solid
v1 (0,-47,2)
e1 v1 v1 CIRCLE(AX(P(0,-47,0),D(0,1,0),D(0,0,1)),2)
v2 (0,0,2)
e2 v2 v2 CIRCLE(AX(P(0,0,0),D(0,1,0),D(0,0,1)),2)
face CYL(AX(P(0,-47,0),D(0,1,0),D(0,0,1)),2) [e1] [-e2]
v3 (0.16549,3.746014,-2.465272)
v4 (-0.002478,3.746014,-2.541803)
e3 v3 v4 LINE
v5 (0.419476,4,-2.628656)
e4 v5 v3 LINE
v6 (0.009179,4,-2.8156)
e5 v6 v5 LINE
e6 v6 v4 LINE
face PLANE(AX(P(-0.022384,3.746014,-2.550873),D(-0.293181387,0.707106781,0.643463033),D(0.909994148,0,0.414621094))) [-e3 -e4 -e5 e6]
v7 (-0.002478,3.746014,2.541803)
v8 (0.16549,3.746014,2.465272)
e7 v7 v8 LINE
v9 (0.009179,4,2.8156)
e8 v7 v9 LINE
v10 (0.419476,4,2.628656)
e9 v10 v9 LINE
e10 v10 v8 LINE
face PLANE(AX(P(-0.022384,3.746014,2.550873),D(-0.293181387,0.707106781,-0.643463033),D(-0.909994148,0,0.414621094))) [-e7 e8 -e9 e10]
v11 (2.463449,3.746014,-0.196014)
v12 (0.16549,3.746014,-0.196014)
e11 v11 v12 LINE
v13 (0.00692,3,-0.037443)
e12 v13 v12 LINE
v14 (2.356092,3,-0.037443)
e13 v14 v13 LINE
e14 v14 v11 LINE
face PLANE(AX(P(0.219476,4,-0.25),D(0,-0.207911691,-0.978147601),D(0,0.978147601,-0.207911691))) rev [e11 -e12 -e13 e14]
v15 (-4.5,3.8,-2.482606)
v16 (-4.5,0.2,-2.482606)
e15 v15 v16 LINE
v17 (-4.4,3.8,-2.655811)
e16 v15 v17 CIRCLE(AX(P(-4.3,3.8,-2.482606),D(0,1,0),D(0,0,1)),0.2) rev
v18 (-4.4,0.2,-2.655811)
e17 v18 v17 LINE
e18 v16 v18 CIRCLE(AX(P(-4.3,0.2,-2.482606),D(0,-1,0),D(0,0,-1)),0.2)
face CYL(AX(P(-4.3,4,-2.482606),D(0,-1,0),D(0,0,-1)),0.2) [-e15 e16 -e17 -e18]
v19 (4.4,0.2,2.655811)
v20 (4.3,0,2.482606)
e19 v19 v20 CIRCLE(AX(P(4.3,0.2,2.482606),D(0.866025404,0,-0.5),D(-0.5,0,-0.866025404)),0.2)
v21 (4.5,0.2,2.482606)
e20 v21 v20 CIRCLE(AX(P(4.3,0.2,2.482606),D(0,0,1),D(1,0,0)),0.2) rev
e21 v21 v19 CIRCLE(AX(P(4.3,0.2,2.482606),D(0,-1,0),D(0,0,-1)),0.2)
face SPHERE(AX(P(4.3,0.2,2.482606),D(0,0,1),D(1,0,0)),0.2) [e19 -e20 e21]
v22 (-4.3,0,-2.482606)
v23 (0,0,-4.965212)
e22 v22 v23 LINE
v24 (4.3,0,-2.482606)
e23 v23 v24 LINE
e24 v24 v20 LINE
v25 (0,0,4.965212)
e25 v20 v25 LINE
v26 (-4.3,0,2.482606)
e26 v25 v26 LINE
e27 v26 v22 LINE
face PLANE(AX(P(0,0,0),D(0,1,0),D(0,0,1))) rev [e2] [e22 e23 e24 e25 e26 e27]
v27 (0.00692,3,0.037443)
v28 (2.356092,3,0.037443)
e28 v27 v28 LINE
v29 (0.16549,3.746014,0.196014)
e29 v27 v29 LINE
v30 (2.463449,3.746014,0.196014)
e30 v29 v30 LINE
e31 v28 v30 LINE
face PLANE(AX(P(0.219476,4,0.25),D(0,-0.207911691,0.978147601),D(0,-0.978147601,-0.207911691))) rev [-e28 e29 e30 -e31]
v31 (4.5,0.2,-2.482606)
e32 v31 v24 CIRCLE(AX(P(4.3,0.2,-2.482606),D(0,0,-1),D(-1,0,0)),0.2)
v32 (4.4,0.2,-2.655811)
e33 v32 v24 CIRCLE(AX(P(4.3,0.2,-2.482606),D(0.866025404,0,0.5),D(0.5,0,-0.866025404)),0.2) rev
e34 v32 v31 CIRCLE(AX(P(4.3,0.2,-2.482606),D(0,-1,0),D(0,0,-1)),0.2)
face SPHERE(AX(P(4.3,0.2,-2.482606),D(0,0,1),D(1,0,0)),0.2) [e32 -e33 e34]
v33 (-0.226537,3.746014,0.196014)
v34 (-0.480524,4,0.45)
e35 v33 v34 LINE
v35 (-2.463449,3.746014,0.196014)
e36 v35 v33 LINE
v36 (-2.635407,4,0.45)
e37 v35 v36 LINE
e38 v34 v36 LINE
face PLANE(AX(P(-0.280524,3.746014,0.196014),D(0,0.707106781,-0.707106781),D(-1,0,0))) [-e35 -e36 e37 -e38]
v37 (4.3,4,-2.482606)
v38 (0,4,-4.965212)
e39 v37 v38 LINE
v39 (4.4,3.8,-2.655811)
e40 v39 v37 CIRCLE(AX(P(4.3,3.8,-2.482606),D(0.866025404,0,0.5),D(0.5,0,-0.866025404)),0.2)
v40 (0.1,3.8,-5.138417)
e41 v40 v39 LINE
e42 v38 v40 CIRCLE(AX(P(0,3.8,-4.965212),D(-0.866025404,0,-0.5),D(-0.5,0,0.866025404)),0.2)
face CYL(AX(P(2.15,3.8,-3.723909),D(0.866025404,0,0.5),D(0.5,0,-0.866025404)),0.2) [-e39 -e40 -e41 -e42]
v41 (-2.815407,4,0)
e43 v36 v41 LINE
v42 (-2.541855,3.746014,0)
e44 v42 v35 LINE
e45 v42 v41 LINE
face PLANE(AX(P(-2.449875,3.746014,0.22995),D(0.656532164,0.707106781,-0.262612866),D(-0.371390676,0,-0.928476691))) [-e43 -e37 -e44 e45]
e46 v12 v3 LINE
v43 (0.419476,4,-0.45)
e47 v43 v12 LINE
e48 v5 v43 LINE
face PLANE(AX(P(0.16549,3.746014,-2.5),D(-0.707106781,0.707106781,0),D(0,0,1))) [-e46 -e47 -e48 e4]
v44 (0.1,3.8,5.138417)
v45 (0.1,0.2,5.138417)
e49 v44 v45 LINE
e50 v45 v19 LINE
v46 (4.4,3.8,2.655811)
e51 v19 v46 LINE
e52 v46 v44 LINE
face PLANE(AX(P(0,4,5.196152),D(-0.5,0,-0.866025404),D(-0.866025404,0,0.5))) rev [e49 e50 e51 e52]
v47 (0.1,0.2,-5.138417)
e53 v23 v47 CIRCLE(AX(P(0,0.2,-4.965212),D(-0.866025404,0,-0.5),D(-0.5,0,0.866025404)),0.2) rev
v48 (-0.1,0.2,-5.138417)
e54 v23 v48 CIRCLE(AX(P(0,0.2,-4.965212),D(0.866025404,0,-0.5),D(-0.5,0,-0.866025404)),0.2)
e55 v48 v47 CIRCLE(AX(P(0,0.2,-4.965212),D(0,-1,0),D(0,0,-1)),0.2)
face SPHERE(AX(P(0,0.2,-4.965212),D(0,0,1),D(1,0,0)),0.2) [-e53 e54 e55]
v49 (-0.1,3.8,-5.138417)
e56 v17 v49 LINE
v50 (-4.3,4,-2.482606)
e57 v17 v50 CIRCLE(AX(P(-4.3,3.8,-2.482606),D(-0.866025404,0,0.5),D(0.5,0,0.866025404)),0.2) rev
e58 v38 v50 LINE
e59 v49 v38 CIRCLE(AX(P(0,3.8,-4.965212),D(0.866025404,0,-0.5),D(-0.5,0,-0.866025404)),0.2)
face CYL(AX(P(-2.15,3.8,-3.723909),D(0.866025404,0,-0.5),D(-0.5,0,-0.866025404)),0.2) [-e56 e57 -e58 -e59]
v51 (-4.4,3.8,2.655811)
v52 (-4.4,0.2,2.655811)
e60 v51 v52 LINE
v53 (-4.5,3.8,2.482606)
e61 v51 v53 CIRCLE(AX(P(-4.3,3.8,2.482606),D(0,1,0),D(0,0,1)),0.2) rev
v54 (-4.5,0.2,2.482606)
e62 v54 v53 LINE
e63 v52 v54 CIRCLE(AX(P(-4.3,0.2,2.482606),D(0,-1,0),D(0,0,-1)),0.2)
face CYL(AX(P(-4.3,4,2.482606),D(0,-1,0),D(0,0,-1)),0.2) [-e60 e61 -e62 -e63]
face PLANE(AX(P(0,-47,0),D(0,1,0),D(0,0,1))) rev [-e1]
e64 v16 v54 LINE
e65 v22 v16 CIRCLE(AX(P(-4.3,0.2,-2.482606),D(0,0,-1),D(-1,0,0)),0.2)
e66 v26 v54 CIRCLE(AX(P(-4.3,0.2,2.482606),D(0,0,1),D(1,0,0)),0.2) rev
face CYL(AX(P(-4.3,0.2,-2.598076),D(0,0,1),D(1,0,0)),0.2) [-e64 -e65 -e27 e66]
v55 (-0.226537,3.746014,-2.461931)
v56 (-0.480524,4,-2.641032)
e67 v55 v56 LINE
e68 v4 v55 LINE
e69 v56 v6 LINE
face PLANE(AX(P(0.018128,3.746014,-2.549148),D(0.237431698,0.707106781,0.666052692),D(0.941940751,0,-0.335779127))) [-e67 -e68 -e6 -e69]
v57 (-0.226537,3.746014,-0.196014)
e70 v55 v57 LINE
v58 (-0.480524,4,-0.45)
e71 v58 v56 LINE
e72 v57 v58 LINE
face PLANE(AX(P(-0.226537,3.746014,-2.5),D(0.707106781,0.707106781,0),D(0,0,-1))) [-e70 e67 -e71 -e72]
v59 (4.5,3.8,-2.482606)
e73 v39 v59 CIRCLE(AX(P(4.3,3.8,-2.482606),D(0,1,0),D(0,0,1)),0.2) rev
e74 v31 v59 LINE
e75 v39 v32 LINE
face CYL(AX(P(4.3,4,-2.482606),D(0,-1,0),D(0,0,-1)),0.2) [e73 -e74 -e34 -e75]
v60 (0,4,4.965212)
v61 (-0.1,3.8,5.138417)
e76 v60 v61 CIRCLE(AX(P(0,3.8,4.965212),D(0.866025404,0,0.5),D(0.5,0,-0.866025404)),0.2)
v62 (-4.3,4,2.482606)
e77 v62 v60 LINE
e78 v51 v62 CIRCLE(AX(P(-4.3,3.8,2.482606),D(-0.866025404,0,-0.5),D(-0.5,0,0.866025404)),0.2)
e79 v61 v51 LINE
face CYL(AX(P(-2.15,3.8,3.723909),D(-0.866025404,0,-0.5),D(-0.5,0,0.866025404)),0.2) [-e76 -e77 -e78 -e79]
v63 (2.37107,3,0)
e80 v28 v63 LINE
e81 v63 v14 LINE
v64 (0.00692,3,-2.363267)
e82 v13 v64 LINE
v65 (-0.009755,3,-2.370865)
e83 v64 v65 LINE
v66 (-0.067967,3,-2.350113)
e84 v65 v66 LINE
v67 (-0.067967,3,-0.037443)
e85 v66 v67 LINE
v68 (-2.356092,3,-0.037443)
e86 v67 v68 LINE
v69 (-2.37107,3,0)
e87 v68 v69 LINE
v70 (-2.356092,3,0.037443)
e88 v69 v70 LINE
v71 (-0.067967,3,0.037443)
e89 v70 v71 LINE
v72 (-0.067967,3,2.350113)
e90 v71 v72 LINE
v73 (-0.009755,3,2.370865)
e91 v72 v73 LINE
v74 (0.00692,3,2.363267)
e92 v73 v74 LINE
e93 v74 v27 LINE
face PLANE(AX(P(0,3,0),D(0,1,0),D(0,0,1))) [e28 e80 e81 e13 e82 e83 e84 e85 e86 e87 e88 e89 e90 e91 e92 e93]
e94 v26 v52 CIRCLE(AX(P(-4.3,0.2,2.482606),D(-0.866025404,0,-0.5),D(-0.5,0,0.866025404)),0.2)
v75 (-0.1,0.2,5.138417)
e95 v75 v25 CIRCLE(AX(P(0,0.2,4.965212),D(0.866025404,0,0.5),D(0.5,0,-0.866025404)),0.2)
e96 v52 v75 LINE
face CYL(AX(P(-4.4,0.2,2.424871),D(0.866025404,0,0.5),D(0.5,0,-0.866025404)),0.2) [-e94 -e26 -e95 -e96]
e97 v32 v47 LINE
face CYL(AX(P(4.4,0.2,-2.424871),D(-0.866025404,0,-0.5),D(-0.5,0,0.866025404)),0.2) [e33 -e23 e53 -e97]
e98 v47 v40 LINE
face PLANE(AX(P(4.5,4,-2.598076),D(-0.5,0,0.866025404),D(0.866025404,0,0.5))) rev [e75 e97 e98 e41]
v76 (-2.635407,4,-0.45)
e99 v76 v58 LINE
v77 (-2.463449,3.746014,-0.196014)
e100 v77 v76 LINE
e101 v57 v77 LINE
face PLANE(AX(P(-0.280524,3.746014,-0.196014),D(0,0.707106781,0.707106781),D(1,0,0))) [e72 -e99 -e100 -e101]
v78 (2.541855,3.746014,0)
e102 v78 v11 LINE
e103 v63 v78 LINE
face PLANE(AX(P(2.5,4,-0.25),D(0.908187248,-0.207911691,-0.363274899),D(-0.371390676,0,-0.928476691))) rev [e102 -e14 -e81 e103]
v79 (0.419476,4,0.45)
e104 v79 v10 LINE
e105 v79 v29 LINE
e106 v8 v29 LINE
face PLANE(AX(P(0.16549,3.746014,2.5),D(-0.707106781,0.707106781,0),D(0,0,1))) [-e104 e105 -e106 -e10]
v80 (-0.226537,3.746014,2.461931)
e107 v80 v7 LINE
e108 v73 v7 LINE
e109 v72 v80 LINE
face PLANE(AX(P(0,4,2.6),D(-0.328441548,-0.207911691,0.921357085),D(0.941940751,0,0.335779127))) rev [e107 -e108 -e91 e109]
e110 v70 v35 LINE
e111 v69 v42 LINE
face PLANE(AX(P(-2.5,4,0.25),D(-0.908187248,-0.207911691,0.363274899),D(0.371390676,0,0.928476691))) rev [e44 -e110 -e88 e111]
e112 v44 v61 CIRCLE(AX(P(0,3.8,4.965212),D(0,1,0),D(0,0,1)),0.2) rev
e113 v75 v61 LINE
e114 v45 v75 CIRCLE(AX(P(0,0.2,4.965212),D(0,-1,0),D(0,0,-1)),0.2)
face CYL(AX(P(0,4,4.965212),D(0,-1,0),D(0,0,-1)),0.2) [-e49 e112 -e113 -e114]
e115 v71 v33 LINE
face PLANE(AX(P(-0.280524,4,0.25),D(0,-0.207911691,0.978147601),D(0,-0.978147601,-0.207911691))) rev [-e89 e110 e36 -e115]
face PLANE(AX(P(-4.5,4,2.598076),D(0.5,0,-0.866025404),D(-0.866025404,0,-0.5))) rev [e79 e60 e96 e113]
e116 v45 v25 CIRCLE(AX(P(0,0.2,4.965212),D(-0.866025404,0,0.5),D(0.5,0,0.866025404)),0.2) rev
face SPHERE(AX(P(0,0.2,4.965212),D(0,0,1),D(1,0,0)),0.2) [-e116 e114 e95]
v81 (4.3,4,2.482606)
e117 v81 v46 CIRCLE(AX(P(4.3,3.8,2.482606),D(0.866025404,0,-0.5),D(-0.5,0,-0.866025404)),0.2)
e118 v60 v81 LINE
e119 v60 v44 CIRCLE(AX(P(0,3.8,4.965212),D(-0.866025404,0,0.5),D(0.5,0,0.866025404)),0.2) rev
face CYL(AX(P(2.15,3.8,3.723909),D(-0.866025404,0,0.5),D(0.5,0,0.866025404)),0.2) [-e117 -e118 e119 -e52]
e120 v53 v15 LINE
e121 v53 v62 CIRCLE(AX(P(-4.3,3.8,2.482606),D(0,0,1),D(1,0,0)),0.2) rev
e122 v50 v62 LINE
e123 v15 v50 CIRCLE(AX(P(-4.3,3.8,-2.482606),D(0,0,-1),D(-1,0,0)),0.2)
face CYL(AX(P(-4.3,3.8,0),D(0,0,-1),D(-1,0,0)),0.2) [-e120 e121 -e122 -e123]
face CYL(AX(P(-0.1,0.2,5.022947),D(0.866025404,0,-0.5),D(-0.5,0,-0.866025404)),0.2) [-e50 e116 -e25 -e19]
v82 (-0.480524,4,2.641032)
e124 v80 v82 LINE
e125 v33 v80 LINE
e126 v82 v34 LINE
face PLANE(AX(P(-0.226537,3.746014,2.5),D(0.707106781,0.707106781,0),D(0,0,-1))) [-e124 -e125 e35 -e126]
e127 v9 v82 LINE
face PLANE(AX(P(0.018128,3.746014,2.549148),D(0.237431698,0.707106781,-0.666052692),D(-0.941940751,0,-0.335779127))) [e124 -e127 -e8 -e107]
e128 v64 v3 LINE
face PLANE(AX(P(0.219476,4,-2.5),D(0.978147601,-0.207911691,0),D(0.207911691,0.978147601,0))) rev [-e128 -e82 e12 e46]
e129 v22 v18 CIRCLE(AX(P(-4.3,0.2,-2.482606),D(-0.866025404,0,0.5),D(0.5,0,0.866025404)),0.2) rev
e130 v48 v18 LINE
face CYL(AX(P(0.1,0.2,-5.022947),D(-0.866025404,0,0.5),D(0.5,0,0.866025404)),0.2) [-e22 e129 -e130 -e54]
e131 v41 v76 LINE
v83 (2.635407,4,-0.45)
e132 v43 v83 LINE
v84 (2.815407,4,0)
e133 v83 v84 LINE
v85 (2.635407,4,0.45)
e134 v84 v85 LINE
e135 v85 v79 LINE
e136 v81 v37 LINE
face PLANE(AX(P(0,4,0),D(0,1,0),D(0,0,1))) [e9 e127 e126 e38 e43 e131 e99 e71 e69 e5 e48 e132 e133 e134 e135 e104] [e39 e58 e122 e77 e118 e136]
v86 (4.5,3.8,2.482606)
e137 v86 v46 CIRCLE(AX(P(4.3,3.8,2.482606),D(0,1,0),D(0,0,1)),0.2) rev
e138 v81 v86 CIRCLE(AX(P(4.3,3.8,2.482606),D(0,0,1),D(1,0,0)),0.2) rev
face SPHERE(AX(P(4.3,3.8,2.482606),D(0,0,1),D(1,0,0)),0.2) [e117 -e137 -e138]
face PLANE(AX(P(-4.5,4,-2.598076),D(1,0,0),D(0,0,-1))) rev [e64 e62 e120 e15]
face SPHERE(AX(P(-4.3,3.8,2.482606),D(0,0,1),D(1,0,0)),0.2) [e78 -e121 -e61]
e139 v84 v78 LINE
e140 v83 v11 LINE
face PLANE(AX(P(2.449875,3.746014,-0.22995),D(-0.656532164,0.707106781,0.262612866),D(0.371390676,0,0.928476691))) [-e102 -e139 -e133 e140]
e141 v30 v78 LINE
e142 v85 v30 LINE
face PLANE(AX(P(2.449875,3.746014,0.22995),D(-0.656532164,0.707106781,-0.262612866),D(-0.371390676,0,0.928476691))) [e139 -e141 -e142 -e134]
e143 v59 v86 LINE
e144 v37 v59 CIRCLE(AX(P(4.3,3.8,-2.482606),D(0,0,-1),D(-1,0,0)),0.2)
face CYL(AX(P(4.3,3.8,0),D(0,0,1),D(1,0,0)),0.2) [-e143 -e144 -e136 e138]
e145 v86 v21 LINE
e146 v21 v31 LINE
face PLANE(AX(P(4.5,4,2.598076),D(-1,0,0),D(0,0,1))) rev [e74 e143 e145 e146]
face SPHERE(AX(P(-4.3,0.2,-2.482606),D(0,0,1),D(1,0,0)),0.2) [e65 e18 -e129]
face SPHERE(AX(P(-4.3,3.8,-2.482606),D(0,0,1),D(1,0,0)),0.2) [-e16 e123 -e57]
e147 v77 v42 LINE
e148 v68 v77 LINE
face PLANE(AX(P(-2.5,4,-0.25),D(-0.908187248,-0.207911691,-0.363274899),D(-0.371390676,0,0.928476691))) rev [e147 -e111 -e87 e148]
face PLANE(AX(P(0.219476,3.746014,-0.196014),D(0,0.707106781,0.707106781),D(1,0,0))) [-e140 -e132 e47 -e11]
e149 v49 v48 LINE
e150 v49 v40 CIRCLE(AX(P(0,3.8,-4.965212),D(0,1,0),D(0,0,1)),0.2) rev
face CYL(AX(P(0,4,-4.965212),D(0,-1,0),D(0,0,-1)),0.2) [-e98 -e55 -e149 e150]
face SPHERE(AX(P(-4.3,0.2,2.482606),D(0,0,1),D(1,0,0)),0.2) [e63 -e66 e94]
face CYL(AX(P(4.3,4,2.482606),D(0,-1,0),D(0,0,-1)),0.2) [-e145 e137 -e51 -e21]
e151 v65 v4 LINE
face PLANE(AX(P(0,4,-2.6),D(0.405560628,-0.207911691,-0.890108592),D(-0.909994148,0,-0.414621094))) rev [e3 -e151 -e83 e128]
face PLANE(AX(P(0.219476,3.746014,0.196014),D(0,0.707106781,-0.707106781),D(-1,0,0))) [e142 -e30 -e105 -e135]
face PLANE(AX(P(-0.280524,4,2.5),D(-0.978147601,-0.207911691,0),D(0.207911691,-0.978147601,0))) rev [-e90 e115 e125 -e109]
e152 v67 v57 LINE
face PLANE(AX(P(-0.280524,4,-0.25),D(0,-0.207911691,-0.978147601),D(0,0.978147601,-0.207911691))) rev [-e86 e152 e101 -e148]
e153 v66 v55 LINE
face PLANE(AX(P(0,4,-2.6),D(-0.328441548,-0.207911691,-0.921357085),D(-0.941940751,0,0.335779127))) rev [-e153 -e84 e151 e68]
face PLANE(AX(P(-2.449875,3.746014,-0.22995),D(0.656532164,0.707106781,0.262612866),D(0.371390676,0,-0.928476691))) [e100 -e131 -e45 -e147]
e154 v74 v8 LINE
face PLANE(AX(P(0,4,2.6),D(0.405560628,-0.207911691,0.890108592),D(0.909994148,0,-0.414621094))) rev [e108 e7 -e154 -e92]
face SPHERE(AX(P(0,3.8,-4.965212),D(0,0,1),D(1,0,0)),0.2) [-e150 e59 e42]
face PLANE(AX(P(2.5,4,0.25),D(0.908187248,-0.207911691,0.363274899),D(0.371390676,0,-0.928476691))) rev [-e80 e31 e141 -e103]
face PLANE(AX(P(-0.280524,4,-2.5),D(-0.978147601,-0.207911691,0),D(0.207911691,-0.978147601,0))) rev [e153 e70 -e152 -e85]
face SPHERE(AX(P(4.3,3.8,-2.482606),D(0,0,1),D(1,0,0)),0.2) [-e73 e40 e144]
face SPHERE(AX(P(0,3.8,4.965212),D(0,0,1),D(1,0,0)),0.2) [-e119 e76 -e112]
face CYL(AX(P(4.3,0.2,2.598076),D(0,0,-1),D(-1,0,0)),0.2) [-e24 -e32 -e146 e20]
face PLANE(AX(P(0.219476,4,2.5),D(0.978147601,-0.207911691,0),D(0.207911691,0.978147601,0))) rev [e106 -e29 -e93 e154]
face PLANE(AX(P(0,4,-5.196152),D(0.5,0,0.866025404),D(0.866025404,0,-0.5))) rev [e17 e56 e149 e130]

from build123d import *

# Parameters (mm, degrees)
SKETCH1_R           = 2
BOSS_EXTRUDE1_DEPTH = 47
BOSS_EXTRUDE2_DEPTH = 4
FILLET1_R           = 0.2
CUT_EXTRUDE2_DEPTH  = 1
CUT_EXTRUDE2_DRAFT  = -12
CHAMFER1_SIZE       = 0.2
CHAMFER1_SIZE2      = 0.259660706


with BuildPart() as part:
    # Sketch1 → Boss-Extrude1 (new body)
    with BuildSketch(Plane(origin=(0, 0, 0), x_dir=(1, 0, 0), z_dir=(0, 1, 0))):
        Circle(SKETCH1_R)
    extrude(amount=-BOSS_EXTRUDE1_DEPTH)

    # Sketch2 → Boss-Extrude2 (add)
    with BuildSketch(Plane(origin=(0, 0, 0), x_dir=(1, 0, 0), z_dir=(0, 1, 0))):
        Polygon((0, 5.196152423), (-4.5, 2.598076211), (-4.5, -2.598076211), (0, -5.196152423), (4.5, -2.598076211), (4.5, 2.598076211), align=None)
    extrude(amount=BOSS_EXTRUDE2_DEPTH)

    # Fillet1
    fillet1_edges = [part.edges().sort_by_distance(p)[0] for p in [
        (2.25, 0, -3.897114317),
        (-2.25, 0, -3.897114317),
        (-4.5, 0, 0),
        (-2.25, 0, 3.897114317),
        (2.25, 0, 3.897114317),
        (4.5, 0, 0),
        (2.25, 4, -3.897114317),
        (-2.25, 4, -3.897114317),
        (-4.5, 4, 0),
        (-2.25, 4, 3.897114317),
        (2.25, 4, 3.897114317),
        (4.5, 2, -2.598076211),
        (4.5, 2, 2.598076211),
        (0, 2, 5.196152423),
        (-4.5, 2, 2.598076211),
        (-4.5, 2, -2.598076211),
        (0, 2, -5.196152423),
        (4.5, 4, 0),
    ]]
    fillet(fillet1_edges, radius=FILLET1_R)


with BuildPart() as cut_extrude2_tool:
    # Sketch3 → Cut-Extrude2 (with draft: the straight prism first)
    with BuildSketch(Plane(origin=(0, 4, 0), x_dir=(1, 0, 0), z_dir=(0, 1, 0))):
        Polygon((0, 2.6), (-0.280523914, 2.5), (-0.280523914, 0.25), (-2.5, 0.25), (-2.6, 0), (-2.5, -0.25), (-0.280523914, -0.25), (-0.280523914, -2.5), (0, -2.6), (0.219476086, -2.5), (0.219476086, -0.25), (2.5, -0.25), (2.6, 0), (2.5, 0.25), (0.219476086, 0.25), (0.219476086, 2.5), align=None)
    extrude(amount=-CUT_EXTRUDE2_DEPTH)
    # Cut-Extrude2: the draft: its side faces are tilted about the plane it starts from
    cut_extrude2_sides = [cut_extrude2_tool.faces().sort_by_distance(p)[0] for p in [
        (-0.140261957, 3.5, -2.55),
        (-0.280523914, 3.5, -1.375),
        (-1.390261957, 3.5, -0.25),
        (-2.55, 3.5, -0.125),
        (-2.55, 3.5, 0.125),
        (-1.390261957, 3.5, 0.25),
        (-0.280523914, 3.5, 1.375),
        (-0.140261957, 3.5, 2.55),
        (0.109738043, 3.5, 2.55),
        (0.219476086, 3.5, 1.375),
        (1.359738043, 3.5, 0.25),
        (2.55, 3.5, 0.125),
        (2.55, 3.5, -0.125),
        (1.359738043, 3.5, -0.25),
        (0.219476086, 3.5, -1.375),
        (0.109738043, 3.5, -2.55),
    ]]
    draft(cut_extrude2_sides, Plane(origin=(0, 4, 0), x_dir=(1, 0, 0), z_dir=(0, 1, 0)), CUT_EXTRUDE2_DRAFT)


with BuildPart() as part_1:
    add(part.part)

    # Cut-Extrude2: cut by cut_extrude2_tool
    add(cut_extrude2_tool.part, mode=Mode.SUBTRACT)

    # Chamfer1
    chamfer1_edges = [part_1.edges().sort_by_distance(p)[0] for p in [
        (0.109738043, 4, 2.55),
        (-0.140261957, 4, 2.55),
        (-0.280523914, 4, 1.375),
        (0.219476086, 4, 1.375),
        (1.359738043, 4, 0.25),
        (2.55, 4, 0.125),
        (2.55, 4, -0.125),
        (1.359738043, 4, -0.25),
        (0.219476086, 4, -1.375),
        (0.109738043, 4, -2.55),
        (-0.140261957, 4, -2.55),
        (-0.280523914, 4, -1.375),
        (-1.390261957, 4, 0.25),
        (-2.55, 4, 0.125),
        (-2.55, 4, -0.125),
        (-1.390261957, 4, -0.25),
    ]]
    chamfer1_side = [part_1.faces().sort_by_distance(p)[0] for p in [
        (2.084316415, 4, -3.61014193),
    ]]
    chamfer(chamfer1_edges, length=CHAMFER1_SIZE, length2=CHAMFER1_SIZE2, reference=chamfer1_side[0])


solid = part_1.part
